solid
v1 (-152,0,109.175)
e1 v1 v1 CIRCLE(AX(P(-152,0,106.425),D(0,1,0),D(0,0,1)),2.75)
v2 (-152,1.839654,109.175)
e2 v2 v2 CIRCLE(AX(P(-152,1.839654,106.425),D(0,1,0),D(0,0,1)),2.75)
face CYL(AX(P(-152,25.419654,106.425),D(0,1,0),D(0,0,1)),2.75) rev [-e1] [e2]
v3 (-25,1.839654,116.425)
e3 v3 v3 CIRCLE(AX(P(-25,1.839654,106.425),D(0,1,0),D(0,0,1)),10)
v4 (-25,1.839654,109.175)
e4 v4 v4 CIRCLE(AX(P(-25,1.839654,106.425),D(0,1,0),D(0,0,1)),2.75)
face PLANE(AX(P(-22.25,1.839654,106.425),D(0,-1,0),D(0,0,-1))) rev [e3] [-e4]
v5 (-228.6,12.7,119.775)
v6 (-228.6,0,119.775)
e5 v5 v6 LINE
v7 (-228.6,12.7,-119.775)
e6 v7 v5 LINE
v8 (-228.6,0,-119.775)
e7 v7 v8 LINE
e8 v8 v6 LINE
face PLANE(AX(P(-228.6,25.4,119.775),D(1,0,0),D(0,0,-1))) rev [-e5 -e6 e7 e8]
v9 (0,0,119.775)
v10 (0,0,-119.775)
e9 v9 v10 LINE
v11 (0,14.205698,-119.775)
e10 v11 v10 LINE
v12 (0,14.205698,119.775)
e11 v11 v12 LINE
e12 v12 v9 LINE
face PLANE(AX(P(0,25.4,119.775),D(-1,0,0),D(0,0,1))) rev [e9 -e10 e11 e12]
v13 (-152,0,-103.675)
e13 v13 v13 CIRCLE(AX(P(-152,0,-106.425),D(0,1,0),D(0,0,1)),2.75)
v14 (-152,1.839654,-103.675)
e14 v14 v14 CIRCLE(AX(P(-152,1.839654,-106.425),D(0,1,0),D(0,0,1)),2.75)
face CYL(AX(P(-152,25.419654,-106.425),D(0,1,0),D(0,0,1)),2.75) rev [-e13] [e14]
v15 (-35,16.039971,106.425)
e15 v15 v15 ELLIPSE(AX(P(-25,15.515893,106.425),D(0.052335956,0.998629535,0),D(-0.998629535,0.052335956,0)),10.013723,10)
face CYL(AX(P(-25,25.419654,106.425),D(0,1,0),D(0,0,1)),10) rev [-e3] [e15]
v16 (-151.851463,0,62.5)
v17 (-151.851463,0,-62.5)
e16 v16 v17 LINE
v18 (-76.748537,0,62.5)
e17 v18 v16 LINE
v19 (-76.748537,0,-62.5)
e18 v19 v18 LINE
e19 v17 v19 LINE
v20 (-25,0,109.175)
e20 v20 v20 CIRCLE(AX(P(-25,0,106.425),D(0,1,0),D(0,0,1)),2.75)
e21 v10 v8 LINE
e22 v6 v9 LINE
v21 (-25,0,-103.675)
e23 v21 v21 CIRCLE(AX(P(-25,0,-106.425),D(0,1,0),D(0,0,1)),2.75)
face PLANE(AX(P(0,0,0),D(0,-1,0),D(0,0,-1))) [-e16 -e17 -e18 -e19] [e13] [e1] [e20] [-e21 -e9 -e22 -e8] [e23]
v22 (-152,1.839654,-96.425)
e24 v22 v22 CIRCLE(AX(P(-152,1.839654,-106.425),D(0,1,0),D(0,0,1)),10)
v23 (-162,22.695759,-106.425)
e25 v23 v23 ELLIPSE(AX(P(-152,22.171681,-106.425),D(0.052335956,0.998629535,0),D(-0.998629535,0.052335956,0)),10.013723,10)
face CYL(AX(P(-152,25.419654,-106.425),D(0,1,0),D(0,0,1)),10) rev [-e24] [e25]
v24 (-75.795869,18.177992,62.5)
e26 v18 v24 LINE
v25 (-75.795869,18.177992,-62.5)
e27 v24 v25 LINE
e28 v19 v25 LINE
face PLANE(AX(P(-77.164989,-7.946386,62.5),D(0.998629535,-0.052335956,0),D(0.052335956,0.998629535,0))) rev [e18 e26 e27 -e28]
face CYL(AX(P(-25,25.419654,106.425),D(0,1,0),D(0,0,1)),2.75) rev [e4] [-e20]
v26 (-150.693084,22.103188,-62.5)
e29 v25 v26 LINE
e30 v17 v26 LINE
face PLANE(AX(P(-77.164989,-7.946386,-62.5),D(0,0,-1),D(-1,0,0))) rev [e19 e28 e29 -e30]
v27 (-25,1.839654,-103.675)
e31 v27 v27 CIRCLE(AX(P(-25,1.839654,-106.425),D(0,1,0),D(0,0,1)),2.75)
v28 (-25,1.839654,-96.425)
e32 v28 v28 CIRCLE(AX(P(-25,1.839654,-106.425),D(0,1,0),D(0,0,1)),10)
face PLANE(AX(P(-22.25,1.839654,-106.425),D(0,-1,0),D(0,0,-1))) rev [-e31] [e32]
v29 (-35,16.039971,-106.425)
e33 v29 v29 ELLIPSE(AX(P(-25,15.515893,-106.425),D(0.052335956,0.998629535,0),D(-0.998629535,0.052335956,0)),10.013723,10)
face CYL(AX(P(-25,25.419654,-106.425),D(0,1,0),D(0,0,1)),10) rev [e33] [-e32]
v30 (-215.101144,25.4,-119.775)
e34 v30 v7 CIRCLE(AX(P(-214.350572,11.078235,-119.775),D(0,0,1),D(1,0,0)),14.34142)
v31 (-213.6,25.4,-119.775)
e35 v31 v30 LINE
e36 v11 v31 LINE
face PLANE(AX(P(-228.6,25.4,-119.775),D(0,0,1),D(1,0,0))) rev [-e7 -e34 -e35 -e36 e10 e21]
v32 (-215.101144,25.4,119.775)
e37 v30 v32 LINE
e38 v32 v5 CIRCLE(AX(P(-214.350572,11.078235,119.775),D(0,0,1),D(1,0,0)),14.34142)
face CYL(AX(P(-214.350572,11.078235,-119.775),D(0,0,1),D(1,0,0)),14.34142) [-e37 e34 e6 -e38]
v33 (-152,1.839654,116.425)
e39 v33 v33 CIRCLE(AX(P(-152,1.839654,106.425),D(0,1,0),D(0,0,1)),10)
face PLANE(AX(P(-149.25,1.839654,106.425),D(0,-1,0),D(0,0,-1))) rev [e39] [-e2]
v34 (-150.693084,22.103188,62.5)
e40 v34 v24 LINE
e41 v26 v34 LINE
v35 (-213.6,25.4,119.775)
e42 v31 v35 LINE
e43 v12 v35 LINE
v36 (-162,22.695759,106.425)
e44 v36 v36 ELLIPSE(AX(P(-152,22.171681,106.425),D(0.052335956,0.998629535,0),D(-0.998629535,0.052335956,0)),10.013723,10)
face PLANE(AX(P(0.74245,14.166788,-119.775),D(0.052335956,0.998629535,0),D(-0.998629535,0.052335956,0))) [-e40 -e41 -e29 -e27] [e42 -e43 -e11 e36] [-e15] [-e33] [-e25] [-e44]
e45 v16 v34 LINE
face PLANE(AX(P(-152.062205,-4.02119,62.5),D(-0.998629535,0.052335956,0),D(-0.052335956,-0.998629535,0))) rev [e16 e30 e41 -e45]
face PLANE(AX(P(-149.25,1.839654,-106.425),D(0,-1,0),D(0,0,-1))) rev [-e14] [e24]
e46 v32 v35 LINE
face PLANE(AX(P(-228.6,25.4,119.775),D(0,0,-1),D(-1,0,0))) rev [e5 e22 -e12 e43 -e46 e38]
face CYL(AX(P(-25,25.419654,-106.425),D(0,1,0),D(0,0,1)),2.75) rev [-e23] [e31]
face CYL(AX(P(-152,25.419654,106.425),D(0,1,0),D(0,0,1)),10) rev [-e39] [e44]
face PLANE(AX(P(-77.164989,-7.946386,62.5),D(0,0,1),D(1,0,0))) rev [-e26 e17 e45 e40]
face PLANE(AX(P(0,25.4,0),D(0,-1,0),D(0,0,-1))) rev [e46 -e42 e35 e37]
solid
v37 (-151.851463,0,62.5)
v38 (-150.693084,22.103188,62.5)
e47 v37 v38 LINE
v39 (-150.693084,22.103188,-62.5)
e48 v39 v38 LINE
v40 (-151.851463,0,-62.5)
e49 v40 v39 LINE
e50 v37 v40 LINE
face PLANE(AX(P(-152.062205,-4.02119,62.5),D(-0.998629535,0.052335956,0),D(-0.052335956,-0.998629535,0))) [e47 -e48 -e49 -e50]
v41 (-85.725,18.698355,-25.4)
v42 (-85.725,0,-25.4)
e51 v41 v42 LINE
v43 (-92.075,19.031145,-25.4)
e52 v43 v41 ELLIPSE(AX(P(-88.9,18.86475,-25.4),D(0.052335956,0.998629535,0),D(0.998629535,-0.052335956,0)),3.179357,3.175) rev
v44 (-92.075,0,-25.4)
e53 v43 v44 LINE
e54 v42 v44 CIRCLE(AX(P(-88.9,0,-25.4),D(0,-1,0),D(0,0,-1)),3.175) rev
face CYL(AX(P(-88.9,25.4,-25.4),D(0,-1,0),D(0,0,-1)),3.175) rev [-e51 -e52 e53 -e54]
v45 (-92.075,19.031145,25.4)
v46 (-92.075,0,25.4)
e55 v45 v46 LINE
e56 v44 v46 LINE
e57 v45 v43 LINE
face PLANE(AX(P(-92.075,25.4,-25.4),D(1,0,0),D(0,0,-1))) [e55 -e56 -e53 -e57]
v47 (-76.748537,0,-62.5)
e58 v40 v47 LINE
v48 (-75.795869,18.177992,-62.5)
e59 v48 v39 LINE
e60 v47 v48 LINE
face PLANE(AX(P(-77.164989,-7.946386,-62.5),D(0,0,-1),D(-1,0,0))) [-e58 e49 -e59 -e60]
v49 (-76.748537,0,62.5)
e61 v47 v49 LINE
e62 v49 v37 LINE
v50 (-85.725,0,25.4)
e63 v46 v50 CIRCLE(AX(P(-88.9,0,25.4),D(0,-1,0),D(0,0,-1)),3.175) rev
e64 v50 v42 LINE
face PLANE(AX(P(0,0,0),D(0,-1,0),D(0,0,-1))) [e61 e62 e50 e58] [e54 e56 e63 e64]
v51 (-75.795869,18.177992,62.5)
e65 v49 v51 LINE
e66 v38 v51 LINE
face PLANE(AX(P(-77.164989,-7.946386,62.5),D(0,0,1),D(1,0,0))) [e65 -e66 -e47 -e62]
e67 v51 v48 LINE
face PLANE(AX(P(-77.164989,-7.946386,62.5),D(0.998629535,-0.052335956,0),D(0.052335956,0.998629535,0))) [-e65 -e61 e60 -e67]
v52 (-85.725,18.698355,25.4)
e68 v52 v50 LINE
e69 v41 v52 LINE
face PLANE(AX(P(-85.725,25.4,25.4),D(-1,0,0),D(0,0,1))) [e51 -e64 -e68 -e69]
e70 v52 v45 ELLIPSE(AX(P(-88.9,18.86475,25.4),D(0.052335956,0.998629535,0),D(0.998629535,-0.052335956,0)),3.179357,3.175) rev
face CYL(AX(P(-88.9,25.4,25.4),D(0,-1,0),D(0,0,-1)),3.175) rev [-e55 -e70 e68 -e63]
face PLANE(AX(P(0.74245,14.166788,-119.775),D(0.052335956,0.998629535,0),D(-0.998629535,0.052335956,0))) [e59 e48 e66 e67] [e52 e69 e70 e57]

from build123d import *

# Parameters (mm, degrees)
SKETCH1_W                               = 228.6
SKETCH1_H                               = 239.55
BOSS_EXTRUDE1_DEPTH                     = 25.4
CUT_EXTRUDE1_START                      = -119.775
CUT_EXTRUDE1_DEPTH                      = 239.55
CBORE_FOR_M5_HEX_HEAD_BOLT1_D           = 5.5
CBORE_FOR_M5_HEX_HEAD_BOLT1_CBORE_D     = 20
CBORE_FOR_M5_HEX_HEAD_BOLT1_CBORE_DEPTH = 23.58
SPLIT1_SURFACE_1_BACK                   = 333.095
SPLIT1_SURFACE_1_DEPTH                  = 666.19
SPLIT1_SURFACE_2_BACK                   = 333.095
SPLIT1_SURFACE_2_DEPTH                  = 666.19
CUT_EXTRUDE2_DEPTH                      = 260.324450496
CUT_EXTRUDE2_DEPTH_BACK                 = 260.324450496


# Read off the part's stored shape, not the designer's step: Cut-Extrude1
with BuildPart() as part:
    # Sketch1 → Boss-Extrude1 (new body)
    with BuildSketch(Plane(origin=(0, 0, 0), x_dir=(1, 0, 0), z_dir=(0, 1, 0))):
        with Locations((-114.3, 0)):
            Rectangle(SKETCH1_W, SKETCH1_H)
    extrude(amount=BOSS_EXTRUDE1_DEPTH)

    # Cut-Extrude1 outline → Cut-Extrude1 (cut)
    with BuildSketch(Plane.XY.offset(CUT_EXTRUDE1_START)):
        with BuildLine():
            ThreePointArc((-228.6, 12.7), (-224.177702735, 21.523512133), (-215.101143845, 25.4))
            Line((-215.101143845, 25.4), (-228.6, 25.4))
            Line((-228.6, 25.4), (-228.6, 12.7))
        make_face()
        Polygon((0, 25.4), (-213.6, 25.4), (0, 14.205698345), align=None)
    extrude(amount=CUT_EXTRUDE1_DEPTH, mode=Mode.SUBTRACT)

    # CBORE for M5 Hex Head Bolt1 (through all)
    with Locations(Plane(origin=(0, 25.419654417, 0), x_dir=(1, 0, 0), z_dir=(0, 1, 0))):
        with Locations((-152, 106.425), (-25, 106.425), (-25, -106.425), (-152, -106.425)):
            CounterBoreHole(CBORE_FOR_M5_HEX_HEAD_BOLT1_D / 2, CBORE_FOR_M5_HEX_HEAD_BOLT1_CBORE_D / 2, CBORE_FOR_M5_HEX_HEAD_BOLT1_CBORE_DEPTH)


with BuildPart() as body_2:
    # Split1: the piece behind the surface
    add(part.part)
    # Split1 surface: a surface, the sketch's curves swept straight by 666.19 mm
    with BuildLine(Plane(origin=(0.742449909, 14.166788194, 0), x_dir=(0.9986295347545743, -0.05233595624293694, 0), z_dir=(0.052335956242936944, 0.9986295347545744, 0)).offset(-SPLIT1_SURFACE_1_BACK), mode=Mode.PRIVATE) as split1_surface_1_path:
        Line((-76.643355822, -62.5), (-151.643355822, -62.5))
        Line((-151.643355822, -62.5), (-151.643355822, 62.5))
        Line((-151.643355822, 62.5), (-76.643355822, 62.5))
        Line((-76.643355822, 62.5), (-76.643355822, -62.5))
    split1_surface_1 = Shell.extrude(split1_surface_1_path.wire(), (0.052335956 * SPLIT1_SURFACE_1_DEPTH, 0.998629535 * SPLIT1_SURFACE_1_DEPTH, 0 * SPLIT1_SURFACE_1_DEPTH))
    split(bisect_by=split1_surface_1, keep=Keep.BOTTOM)

    # Sketch12 → Cut-Extrude2 (cut, two sides: drawn at the far end of the back side and taken through both)
    with BuildSketch(Plane(origin=(0, 0, 0), x_dir=(1, 0, 0), z_dir=(0, 1, 0)).offset(-CUT_EXTRUDE2_DEPTH_BACK)):
        with BuildLine():
            Line((-92.075, 25.4), (-92.075, -25.4))
            ThreePointArc((-92.075, -25.4), (-88.9, -28.575), (-85.725, -25.4))
            Line((-85.725, -25.4), (-85.725, 25.4))
            ThreePointArc((-85.725, 25.4), (-88.9, 28.575), (-92.075, 25.4))
        make_face()
    extrude(amount=CUT_EXTRUDE2_DEPTH + CUT_EXTRUDE2_DEPTH_BACK, mode=Mode.SUBTRACT)


with BuildPart() as part_1:
    add(part.part)

    # Split1: split by a surface, the side it looks to stays
    # Split1 surface: a surface, the sketch's curves swept straight by 666.19 mm
    with BuildLine(Plane(origin=(0.742449909, 14.166788194, 0), x_dir=(0.9986295347545743, -0.05233595624293694, 0), z_dir=(0.052335956242936944, 0.9986295347545744, 0)).offset(-SPLIT1_SURFACE_2_BACK), mode=Mode.PRIVATE) as split1_surface_2_path:
        Line((-76.643355822, -62.5), (-151.643355822, -62.5))
        Line((-151.643355822, -62.5), (-151.643355822, 62.5))
        Line((-151.643355822, 62.5), (-76.643355822, 62.5))
        Line((-76.643355822, 62.5), (-76.643355822, -62.5))
    split1_surface_2 = Shell.extrude(split1_surface_2_path.wire(), (0.052335956 * SPLIT1_SURFACE_2_DEPTH, 0.998629535 * SPLIT1_SURFACE_2_DEPTH, 0 * SPLIT1_SURFACE_2_DEPTH))
    split(bisect_by=split1_surface_2, keep=Keep.TOP)


solid = Compound([body_2.part, part_1.part])
